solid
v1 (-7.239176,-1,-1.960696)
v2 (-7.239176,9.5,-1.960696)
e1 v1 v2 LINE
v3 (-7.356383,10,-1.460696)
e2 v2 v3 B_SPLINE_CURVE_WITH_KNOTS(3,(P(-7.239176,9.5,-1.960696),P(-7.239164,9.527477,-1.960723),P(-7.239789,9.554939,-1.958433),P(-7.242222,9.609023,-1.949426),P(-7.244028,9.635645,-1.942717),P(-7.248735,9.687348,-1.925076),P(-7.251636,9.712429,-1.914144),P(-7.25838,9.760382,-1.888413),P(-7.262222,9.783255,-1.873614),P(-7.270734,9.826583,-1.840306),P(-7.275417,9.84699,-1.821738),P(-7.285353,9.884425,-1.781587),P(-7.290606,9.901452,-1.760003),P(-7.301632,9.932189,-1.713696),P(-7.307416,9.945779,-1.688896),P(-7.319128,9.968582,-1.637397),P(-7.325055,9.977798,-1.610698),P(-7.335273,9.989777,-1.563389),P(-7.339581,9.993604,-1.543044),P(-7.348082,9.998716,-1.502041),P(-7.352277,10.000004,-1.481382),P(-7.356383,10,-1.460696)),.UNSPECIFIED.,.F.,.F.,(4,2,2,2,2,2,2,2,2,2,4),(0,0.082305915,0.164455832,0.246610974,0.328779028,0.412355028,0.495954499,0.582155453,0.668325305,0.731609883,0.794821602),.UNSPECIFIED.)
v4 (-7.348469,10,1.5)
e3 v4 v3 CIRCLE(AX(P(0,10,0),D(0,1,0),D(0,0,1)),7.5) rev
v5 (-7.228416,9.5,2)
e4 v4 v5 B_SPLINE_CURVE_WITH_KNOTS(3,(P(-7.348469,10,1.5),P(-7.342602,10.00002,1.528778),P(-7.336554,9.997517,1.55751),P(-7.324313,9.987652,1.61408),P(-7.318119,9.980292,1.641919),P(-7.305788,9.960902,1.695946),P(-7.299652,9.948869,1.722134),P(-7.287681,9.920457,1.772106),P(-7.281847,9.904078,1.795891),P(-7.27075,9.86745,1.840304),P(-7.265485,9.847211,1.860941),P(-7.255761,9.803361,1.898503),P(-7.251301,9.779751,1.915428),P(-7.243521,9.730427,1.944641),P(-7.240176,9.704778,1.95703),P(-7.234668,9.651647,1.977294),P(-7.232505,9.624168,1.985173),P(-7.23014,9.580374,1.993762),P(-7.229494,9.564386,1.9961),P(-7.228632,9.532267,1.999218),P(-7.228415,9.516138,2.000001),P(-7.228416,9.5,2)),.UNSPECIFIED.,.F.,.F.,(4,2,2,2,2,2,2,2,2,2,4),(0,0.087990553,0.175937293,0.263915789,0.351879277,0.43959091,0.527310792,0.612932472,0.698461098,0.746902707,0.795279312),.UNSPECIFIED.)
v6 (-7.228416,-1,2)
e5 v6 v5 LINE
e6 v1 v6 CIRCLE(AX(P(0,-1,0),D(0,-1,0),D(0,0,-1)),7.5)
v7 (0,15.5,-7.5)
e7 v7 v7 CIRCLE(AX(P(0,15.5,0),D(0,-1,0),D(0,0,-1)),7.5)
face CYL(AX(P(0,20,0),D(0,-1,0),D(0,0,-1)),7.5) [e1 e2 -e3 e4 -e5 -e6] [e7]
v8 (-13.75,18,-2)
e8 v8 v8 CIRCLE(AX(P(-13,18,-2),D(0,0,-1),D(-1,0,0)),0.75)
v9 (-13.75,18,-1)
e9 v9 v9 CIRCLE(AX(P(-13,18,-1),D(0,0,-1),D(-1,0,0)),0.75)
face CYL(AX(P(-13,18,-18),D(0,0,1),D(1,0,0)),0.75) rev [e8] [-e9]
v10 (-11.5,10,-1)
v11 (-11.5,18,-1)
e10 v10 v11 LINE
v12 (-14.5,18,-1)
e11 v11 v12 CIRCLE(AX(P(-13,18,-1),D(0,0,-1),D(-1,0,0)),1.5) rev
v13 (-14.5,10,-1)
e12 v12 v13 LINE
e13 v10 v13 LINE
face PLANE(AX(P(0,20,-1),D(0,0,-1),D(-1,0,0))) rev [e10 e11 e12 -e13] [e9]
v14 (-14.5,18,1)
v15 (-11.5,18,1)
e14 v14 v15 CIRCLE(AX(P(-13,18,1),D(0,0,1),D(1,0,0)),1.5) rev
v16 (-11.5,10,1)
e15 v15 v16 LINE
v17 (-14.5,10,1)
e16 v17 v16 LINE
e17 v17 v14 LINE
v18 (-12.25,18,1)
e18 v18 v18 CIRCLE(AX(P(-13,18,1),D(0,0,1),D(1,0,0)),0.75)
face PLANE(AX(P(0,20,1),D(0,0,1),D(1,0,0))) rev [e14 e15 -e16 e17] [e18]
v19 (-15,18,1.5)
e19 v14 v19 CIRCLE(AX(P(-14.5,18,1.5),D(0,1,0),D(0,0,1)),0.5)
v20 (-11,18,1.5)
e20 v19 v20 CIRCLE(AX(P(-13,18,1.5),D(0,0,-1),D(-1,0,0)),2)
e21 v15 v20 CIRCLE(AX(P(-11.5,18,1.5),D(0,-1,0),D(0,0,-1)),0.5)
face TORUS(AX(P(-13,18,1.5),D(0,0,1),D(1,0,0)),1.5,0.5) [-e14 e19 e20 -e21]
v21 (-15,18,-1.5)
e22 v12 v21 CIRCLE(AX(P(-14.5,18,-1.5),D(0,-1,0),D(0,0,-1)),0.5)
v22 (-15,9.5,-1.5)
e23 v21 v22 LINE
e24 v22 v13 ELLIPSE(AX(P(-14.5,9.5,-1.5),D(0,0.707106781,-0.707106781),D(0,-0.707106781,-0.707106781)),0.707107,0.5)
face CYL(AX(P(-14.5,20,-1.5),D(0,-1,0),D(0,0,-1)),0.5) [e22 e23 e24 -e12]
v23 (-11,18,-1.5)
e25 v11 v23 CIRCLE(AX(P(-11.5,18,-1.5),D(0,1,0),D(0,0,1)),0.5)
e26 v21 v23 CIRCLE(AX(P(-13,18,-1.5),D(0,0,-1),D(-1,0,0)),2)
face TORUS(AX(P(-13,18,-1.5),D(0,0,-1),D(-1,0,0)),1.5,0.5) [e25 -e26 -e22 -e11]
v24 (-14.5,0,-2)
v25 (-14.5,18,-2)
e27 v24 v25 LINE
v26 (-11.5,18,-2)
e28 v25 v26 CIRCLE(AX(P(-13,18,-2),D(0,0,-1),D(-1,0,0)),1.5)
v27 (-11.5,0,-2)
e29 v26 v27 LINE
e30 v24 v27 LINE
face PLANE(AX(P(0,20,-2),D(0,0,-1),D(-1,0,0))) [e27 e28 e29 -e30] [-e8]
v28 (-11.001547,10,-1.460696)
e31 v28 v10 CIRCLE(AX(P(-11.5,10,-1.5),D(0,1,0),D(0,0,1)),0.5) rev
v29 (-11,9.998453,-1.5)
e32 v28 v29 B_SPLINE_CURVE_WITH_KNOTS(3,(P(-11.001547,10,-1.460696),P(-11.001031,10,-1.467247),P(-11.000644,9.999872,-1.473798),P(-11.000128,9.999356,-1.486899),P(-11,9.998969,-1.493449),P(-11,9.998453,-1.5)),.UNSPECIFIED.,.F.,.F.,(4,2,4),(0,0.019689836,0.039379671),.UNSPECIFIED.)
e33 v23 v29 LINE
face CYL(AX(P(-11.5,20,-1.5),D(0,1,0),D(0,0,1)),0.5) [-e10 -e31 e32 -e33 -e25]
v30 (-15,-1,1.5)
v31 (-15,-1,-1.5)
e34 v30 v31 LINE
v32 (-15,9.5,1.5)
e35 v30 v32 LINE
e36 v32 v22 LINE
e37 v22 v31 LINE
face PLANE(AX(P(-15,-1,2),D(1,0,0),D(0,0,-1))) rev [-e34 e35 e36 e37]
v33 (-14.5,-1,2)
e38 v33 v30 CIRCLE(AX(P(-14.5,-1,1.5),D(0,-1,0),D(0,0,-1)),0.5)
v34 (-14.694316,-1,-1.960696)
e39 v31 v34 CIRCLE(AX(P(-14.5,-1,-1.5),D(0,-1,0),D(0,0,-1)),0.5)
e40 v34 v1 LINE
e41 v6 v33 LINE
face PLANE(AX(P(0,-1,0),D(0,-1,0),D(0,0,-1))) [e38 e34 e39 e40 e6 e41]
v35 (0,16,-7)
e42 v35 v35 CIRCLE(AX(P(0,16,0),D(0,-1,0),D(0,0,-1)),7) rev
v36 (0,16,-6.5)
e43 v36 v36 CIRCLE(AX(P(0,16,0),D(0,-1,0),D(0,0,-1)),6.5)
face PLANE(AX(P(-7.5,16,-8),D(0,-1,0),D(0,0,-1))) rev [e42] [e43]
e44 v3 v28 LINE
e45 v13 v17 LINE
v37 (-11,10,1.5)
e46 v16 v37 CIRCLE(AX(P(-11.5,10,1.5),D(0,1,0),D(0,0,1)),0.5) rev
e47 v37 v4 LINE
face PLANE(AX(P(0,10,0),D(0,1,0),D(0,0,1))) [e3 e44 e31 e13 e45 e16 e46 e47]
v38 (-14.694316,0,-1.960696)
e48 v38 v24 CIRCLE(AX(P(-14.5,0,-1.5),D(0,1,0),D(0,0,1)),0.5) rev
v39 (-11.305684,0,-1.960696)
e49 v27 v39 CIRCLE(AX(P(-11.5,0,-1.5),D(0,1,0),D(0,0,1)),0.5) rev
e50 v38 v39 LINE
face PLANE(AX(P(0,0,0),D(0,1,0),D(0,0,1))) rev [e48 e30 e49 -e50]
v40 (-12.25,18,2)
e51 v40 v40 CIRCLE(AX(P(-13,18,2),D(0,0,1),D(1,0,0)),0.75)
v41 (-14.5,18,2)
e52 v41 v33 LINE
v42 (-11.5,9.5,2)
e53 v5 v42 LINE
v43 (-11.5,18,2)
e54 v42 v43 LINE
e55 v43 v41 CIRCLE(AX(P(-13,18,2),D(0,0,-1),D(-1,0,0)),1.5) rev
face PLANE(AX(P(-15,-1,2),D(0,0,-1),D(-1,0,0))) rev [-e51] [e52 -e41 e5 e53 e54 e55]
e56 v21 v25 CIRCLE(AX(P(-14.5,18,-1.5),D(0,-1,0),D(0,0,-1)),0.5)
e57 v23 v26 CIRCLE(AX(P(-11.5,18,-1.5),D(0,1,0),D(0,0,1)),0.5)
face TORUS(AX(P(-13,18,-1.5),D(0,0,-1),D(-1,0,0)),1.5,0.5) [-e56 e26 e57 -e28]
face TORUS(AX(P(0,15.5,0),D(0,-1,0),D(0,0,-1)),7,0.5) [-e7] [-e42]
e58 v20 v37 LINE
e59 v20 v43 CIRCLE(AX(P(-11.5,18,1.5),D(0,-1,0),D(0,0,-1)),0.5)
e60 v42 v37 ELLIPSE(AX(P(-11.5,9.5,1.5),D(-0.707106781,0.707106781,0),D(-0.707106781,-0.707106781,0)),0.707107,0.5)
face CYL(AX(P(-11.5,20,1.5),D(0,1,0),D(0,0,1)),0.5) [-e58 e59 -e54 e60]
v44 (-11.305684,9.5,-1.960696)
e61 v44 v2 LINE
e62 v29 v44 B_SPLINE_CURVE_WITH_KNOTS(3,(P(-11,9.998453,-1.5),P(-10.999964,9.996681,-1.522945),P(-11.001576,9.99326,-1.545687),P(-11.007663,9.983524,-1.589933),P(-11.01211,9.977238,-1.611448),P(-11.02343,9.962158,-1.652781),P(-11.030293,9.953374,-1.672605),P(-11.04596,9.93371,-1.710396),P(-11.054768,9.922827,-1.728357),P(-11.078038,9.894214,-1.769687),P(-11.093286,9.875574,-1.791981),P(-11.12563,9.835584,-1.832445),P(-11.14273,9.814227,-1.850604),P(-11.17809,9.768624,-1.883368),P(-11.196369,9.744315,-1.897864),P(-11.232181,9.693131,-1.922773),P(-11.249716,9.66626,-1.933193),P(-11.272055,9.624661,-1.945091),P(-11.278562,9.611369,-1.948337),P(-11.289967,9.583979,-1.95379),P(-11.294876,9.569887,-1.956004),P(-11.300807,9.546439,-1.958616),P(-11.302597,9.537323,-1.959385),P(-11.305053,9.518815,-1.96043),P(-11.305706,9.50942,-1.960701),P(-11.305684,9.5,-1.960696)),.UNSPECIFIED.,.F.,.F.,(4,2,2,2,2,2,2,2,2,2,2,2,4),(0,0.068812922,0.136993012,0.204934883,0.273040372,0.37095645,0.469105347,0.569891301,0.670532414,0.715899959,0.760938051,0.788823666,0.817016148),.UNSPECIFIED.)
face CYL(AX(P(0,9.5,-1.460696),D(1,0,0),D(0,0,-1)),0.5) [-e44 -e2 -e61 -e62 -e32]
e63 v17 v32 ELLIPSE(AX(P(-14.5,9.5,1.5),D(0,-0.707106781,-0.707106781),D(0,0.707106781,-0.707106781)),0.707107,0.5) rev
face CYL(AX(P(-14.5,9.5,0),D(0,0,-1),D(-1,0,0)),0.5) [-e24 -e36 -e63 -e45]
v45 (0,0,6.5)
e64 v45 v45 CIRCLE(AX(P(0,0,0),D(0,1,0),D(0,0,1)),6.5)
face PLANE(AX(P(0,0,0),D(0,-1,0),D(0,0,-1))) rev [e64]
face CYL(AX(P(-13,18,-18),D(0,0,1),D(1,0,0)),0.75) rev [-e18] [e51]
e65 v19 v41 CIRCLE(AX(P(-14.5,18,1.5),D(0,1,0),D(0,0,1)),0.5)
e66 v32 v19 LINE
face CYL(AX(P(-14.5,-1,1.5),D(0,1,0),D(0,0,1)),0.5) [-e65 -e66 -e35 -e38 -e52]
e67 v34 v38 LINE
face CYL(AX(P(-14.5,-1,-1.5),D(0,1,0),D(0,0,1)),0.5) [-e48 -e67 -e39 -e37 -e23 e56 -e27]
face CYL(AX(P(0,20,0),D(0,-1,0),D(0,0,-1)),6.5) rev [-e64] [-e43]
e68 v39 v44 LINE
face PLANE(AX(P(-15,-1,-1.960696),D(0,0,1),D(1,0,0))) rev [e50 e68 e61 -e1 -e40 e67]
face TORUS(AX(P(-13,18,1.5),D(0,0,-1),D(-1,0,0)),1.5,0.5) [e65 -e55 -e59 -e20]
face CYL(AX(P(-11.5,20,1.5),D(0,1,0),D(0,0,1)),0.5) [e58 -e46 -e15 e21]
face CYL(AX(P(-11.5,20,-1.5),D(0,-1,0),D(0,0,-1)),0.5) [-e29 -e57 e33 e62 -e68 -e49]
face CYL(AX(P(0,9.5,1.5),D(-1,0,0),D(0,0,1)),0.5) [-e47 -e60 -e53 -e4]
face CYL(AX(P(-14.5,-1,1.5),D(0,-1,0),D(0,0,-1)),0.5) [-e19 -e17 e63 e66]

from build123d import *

# Parameters (mm, degrees)
SKETCH1_R                = 7.5
SKETCH1_R_2              = 6.5
BOSS_EXTRUDE2_DEPTH      = 20
SKETCH1_W                = 4
SKETCH1_H                = 1
BOSS_EXTRUDE2_2_DEPTH    = 20
BOSS_EXTRUDE2_3_DEPTH    = 20
BOSS_EXTRUDE3_START      = 1
BOSS_EXTRUDE3_DEPTH      = 1
SKETCH5_W                = 4
SKETCH5_H                = 2
BOSS_EXTRUDE4_DEPTH      = 10
CUT_EXTRUDE5_START       = 16
CUT_EXTRUDE5_OUTLINE_R   = 7.5
CUT_EXTRUDE5_OUTLINE_R_2 = 6.5
CUT_EXTRUDE5_DEPTH       = 4
CUT_EXTRUDE6_DEPTH       = 20
FILLET1_R                = 0.5
FILLET2_R                = 0.5


# Read off the part's stored shape, not the designer's step: Cut-Extrude5
with BuildPart() as part:
    # Sketch1 → Boss-Extrude2 (new body)
    with BuildSketch(Plane(origin=(0, 0, 0), x_dir=(1, 0, 0), z_dir=(0, 1, 0))):
        with Locations(Location((0, 0, 0), (0, 0, 270))):
            Circle(SKETCH1_R)
        with Locations(Location((0, 0, 0), (0, 0, 270))):
            Circle(SKETCH1_R_2, mode=Mode.SUBTRACT)
    extrude(amount=BOSS_EXTRUDE2_DEPTH)



with BuildPart() as body_2:
    # Sketch1 → Boss-Extrude2 2 (new body)
    with BuildSketch(Plane(origin=(0, 0, 0), x_dir=(1, 0, 0), z_dir=(0, 1, 0))):
        with Locations((-13, 1.5)):
            Rectangle(SKETCH1_W, SKETCH1_H)
    extrude(amount=BOSS_EXTRUDE2_2_DEPTH)


with BuildPart() as body_3:
    # Sketch1 → Boss-Extrude2 3 (new body)
    with BuildSketch(Plane(origin=(0, 0, 0), x_dir=(1, 0, 0), z_dir=(0, 1, 0))):
        with Locations((-13, -1.5)):
            Rectangle(SKETCH1_W, SKETCH1_H)
    extrude(amount=BOSS_EXTRUDE2_3_DEPTH)


with BuildPart() as part_1:
    add(part.part)

    add(body_2.part)  # Boss-Extrude3 merges body 2

    add(body_3.part)  # Boss-Extrude3 merges body 3
    # Sketch3 → Boss-Extrude3 (add)
    with BuildSketch(Plane(origin=(0, 0, 0), x_dir=(-1, 0, 0), z_dir=(0, -1, 0)).offset(BOSS_EXTRUDE3_START)):
        with BuildLine():
            Line((15, -2), (7.228416147, -2))
            ThreePointArc((7.228416147, -2), (-7.499972324, 0.020374901), (7.239176027, 1.96069642))
            Line((7.239176027, 1.96069642), (15, 1.96069642))
            Line((15, 1.96069642), (15, -2))
        make_face()
    extrude(amount=-BOSS_EXTRUDE3_DEPTH)

    # Sketch5 → Boss-Extrude4 (add)
    with BuildSketch(Plane(origin=(0, 0, 0), x_dir=(1, 0, 0), z_dir=(0, 1, 0))):
        with BuildLine():
            Line((-11, 1), (-11, -1))
            Line((-11, -1), (-11, -2))
            Line((-11, -2), (-7.228416147, -2))
            ThreePointArc((-7.228416147, -2), (-7.499972324, -0.020374901), (-7.239176027, 1.96069642))
            Line((-7.239176027, 1.96069642), (-11, 1.96069642))
            Line((-11, 1.96069642), (-11, 1))
        make_face()
        with Locations((-13, 0)):
            Rectangle(SKETCH5_W, SKETCH5_H)
    extrude(amount=BOSS_EXTRUDE4_DEPTH)


with BuildPart() as boss_extrude4_kept_piece:
    # of the separate pieces the step leaves, the one the design keeps (boss_extrude4_pieces_kept)
    add(part_1.part.solids().sort_by_distance((0, 0, 7.5))[0])

    # Cut-Extrude5 outline → Cut-Extrude5 (cut)
    with BuildSketch(Plane(origin=(0, 0, 0), x_dir=(1, 0, 0), z_dir=(0, 1, 0)).offset(CUT_EXTRUDE5_START)):
        Circle(CUT_EXTRUDE5_OUTLINE_R)
        Circle(CUT_EXTRUDE5_OUTLINE_R_2, mode=Mode.SUBTRACT)
    extrude(amount=CUT_EXTRUDE5_DEPTH, mode=Mode.SUBTRACT)

    # Sketch7 → Cut-Extrude6 (cut)
    with BuildSketch(Plane.XY.offset(2)):
        with BuildLine():
            ThreePointArc((-12.25, 18), (-13, 18.75), (-13.75, 18))
            Line((-13.75, 18), (-12.25, 18))
        make_face()
        with BuildLine():
            Line((-12.25, 18), (-13.75, 18))
            ThreePointArc((-13.75, 18), (-13, 17.25), (-12.25, 18))
        make_face()
        with BuildLine():
            Line((-11, 20), (-13, 20))
            ThreePointArc((-13, 20), (-11.585786438, 19.414213562), (-11, 18))
            Line((-11, 18), (-11, 20))
        make_face()
        with BuildLine():
            Line((-13, 20), (-15, 20))
            Line((-15, 20), (-15, 18))
            ThreePointArc((-15, 18), (-14.414213562, 19.414213562), (-13, 20))
        make_face()
    extrude(amount=-CUT_EXTRUDE6_DEPTH, mode=Mode.SUBTRACT)

    # Fillet1
    fillet1_edges = [boss_extrude4_kept_piece.edges().sort_by_distance(p)[0] for p in [
        (-15, 9, -2),
        (-11, 9, -2),
        (-15, 14, -1),
        (-11, 14, -1),
        (-11, 14, 1),
        (-15, 14, 1),
        (-11, 14, 2),
        (-15, 8.5, 2),
        (0, 16, -7.5),
        (-13, 20, -2),
        (-13, 20, -1),
        (-13, 20, 1),
        (-13, 20, 2),
    ]]
    fillet(fillet1_edges, radius=FILLET1_R - 0.0001)  # a hair under: the kernel refuses the full size

    # Fillet2
    fillet2_edges = [boss_extrude4_kept_piece.edges().sort_by_distance(p)[0] for p in [
        (-9.272389998, 10, -1.96069642),
        (-15, 10, 0),
        (-9.364158074, 10, 2),
    ]]
    fillet(fillet2_edges, radius=FILLET2_R - 0.0001)  # a hair under: the kernel refuses the full size


solid = boss_extrude4_kept_piece.part
